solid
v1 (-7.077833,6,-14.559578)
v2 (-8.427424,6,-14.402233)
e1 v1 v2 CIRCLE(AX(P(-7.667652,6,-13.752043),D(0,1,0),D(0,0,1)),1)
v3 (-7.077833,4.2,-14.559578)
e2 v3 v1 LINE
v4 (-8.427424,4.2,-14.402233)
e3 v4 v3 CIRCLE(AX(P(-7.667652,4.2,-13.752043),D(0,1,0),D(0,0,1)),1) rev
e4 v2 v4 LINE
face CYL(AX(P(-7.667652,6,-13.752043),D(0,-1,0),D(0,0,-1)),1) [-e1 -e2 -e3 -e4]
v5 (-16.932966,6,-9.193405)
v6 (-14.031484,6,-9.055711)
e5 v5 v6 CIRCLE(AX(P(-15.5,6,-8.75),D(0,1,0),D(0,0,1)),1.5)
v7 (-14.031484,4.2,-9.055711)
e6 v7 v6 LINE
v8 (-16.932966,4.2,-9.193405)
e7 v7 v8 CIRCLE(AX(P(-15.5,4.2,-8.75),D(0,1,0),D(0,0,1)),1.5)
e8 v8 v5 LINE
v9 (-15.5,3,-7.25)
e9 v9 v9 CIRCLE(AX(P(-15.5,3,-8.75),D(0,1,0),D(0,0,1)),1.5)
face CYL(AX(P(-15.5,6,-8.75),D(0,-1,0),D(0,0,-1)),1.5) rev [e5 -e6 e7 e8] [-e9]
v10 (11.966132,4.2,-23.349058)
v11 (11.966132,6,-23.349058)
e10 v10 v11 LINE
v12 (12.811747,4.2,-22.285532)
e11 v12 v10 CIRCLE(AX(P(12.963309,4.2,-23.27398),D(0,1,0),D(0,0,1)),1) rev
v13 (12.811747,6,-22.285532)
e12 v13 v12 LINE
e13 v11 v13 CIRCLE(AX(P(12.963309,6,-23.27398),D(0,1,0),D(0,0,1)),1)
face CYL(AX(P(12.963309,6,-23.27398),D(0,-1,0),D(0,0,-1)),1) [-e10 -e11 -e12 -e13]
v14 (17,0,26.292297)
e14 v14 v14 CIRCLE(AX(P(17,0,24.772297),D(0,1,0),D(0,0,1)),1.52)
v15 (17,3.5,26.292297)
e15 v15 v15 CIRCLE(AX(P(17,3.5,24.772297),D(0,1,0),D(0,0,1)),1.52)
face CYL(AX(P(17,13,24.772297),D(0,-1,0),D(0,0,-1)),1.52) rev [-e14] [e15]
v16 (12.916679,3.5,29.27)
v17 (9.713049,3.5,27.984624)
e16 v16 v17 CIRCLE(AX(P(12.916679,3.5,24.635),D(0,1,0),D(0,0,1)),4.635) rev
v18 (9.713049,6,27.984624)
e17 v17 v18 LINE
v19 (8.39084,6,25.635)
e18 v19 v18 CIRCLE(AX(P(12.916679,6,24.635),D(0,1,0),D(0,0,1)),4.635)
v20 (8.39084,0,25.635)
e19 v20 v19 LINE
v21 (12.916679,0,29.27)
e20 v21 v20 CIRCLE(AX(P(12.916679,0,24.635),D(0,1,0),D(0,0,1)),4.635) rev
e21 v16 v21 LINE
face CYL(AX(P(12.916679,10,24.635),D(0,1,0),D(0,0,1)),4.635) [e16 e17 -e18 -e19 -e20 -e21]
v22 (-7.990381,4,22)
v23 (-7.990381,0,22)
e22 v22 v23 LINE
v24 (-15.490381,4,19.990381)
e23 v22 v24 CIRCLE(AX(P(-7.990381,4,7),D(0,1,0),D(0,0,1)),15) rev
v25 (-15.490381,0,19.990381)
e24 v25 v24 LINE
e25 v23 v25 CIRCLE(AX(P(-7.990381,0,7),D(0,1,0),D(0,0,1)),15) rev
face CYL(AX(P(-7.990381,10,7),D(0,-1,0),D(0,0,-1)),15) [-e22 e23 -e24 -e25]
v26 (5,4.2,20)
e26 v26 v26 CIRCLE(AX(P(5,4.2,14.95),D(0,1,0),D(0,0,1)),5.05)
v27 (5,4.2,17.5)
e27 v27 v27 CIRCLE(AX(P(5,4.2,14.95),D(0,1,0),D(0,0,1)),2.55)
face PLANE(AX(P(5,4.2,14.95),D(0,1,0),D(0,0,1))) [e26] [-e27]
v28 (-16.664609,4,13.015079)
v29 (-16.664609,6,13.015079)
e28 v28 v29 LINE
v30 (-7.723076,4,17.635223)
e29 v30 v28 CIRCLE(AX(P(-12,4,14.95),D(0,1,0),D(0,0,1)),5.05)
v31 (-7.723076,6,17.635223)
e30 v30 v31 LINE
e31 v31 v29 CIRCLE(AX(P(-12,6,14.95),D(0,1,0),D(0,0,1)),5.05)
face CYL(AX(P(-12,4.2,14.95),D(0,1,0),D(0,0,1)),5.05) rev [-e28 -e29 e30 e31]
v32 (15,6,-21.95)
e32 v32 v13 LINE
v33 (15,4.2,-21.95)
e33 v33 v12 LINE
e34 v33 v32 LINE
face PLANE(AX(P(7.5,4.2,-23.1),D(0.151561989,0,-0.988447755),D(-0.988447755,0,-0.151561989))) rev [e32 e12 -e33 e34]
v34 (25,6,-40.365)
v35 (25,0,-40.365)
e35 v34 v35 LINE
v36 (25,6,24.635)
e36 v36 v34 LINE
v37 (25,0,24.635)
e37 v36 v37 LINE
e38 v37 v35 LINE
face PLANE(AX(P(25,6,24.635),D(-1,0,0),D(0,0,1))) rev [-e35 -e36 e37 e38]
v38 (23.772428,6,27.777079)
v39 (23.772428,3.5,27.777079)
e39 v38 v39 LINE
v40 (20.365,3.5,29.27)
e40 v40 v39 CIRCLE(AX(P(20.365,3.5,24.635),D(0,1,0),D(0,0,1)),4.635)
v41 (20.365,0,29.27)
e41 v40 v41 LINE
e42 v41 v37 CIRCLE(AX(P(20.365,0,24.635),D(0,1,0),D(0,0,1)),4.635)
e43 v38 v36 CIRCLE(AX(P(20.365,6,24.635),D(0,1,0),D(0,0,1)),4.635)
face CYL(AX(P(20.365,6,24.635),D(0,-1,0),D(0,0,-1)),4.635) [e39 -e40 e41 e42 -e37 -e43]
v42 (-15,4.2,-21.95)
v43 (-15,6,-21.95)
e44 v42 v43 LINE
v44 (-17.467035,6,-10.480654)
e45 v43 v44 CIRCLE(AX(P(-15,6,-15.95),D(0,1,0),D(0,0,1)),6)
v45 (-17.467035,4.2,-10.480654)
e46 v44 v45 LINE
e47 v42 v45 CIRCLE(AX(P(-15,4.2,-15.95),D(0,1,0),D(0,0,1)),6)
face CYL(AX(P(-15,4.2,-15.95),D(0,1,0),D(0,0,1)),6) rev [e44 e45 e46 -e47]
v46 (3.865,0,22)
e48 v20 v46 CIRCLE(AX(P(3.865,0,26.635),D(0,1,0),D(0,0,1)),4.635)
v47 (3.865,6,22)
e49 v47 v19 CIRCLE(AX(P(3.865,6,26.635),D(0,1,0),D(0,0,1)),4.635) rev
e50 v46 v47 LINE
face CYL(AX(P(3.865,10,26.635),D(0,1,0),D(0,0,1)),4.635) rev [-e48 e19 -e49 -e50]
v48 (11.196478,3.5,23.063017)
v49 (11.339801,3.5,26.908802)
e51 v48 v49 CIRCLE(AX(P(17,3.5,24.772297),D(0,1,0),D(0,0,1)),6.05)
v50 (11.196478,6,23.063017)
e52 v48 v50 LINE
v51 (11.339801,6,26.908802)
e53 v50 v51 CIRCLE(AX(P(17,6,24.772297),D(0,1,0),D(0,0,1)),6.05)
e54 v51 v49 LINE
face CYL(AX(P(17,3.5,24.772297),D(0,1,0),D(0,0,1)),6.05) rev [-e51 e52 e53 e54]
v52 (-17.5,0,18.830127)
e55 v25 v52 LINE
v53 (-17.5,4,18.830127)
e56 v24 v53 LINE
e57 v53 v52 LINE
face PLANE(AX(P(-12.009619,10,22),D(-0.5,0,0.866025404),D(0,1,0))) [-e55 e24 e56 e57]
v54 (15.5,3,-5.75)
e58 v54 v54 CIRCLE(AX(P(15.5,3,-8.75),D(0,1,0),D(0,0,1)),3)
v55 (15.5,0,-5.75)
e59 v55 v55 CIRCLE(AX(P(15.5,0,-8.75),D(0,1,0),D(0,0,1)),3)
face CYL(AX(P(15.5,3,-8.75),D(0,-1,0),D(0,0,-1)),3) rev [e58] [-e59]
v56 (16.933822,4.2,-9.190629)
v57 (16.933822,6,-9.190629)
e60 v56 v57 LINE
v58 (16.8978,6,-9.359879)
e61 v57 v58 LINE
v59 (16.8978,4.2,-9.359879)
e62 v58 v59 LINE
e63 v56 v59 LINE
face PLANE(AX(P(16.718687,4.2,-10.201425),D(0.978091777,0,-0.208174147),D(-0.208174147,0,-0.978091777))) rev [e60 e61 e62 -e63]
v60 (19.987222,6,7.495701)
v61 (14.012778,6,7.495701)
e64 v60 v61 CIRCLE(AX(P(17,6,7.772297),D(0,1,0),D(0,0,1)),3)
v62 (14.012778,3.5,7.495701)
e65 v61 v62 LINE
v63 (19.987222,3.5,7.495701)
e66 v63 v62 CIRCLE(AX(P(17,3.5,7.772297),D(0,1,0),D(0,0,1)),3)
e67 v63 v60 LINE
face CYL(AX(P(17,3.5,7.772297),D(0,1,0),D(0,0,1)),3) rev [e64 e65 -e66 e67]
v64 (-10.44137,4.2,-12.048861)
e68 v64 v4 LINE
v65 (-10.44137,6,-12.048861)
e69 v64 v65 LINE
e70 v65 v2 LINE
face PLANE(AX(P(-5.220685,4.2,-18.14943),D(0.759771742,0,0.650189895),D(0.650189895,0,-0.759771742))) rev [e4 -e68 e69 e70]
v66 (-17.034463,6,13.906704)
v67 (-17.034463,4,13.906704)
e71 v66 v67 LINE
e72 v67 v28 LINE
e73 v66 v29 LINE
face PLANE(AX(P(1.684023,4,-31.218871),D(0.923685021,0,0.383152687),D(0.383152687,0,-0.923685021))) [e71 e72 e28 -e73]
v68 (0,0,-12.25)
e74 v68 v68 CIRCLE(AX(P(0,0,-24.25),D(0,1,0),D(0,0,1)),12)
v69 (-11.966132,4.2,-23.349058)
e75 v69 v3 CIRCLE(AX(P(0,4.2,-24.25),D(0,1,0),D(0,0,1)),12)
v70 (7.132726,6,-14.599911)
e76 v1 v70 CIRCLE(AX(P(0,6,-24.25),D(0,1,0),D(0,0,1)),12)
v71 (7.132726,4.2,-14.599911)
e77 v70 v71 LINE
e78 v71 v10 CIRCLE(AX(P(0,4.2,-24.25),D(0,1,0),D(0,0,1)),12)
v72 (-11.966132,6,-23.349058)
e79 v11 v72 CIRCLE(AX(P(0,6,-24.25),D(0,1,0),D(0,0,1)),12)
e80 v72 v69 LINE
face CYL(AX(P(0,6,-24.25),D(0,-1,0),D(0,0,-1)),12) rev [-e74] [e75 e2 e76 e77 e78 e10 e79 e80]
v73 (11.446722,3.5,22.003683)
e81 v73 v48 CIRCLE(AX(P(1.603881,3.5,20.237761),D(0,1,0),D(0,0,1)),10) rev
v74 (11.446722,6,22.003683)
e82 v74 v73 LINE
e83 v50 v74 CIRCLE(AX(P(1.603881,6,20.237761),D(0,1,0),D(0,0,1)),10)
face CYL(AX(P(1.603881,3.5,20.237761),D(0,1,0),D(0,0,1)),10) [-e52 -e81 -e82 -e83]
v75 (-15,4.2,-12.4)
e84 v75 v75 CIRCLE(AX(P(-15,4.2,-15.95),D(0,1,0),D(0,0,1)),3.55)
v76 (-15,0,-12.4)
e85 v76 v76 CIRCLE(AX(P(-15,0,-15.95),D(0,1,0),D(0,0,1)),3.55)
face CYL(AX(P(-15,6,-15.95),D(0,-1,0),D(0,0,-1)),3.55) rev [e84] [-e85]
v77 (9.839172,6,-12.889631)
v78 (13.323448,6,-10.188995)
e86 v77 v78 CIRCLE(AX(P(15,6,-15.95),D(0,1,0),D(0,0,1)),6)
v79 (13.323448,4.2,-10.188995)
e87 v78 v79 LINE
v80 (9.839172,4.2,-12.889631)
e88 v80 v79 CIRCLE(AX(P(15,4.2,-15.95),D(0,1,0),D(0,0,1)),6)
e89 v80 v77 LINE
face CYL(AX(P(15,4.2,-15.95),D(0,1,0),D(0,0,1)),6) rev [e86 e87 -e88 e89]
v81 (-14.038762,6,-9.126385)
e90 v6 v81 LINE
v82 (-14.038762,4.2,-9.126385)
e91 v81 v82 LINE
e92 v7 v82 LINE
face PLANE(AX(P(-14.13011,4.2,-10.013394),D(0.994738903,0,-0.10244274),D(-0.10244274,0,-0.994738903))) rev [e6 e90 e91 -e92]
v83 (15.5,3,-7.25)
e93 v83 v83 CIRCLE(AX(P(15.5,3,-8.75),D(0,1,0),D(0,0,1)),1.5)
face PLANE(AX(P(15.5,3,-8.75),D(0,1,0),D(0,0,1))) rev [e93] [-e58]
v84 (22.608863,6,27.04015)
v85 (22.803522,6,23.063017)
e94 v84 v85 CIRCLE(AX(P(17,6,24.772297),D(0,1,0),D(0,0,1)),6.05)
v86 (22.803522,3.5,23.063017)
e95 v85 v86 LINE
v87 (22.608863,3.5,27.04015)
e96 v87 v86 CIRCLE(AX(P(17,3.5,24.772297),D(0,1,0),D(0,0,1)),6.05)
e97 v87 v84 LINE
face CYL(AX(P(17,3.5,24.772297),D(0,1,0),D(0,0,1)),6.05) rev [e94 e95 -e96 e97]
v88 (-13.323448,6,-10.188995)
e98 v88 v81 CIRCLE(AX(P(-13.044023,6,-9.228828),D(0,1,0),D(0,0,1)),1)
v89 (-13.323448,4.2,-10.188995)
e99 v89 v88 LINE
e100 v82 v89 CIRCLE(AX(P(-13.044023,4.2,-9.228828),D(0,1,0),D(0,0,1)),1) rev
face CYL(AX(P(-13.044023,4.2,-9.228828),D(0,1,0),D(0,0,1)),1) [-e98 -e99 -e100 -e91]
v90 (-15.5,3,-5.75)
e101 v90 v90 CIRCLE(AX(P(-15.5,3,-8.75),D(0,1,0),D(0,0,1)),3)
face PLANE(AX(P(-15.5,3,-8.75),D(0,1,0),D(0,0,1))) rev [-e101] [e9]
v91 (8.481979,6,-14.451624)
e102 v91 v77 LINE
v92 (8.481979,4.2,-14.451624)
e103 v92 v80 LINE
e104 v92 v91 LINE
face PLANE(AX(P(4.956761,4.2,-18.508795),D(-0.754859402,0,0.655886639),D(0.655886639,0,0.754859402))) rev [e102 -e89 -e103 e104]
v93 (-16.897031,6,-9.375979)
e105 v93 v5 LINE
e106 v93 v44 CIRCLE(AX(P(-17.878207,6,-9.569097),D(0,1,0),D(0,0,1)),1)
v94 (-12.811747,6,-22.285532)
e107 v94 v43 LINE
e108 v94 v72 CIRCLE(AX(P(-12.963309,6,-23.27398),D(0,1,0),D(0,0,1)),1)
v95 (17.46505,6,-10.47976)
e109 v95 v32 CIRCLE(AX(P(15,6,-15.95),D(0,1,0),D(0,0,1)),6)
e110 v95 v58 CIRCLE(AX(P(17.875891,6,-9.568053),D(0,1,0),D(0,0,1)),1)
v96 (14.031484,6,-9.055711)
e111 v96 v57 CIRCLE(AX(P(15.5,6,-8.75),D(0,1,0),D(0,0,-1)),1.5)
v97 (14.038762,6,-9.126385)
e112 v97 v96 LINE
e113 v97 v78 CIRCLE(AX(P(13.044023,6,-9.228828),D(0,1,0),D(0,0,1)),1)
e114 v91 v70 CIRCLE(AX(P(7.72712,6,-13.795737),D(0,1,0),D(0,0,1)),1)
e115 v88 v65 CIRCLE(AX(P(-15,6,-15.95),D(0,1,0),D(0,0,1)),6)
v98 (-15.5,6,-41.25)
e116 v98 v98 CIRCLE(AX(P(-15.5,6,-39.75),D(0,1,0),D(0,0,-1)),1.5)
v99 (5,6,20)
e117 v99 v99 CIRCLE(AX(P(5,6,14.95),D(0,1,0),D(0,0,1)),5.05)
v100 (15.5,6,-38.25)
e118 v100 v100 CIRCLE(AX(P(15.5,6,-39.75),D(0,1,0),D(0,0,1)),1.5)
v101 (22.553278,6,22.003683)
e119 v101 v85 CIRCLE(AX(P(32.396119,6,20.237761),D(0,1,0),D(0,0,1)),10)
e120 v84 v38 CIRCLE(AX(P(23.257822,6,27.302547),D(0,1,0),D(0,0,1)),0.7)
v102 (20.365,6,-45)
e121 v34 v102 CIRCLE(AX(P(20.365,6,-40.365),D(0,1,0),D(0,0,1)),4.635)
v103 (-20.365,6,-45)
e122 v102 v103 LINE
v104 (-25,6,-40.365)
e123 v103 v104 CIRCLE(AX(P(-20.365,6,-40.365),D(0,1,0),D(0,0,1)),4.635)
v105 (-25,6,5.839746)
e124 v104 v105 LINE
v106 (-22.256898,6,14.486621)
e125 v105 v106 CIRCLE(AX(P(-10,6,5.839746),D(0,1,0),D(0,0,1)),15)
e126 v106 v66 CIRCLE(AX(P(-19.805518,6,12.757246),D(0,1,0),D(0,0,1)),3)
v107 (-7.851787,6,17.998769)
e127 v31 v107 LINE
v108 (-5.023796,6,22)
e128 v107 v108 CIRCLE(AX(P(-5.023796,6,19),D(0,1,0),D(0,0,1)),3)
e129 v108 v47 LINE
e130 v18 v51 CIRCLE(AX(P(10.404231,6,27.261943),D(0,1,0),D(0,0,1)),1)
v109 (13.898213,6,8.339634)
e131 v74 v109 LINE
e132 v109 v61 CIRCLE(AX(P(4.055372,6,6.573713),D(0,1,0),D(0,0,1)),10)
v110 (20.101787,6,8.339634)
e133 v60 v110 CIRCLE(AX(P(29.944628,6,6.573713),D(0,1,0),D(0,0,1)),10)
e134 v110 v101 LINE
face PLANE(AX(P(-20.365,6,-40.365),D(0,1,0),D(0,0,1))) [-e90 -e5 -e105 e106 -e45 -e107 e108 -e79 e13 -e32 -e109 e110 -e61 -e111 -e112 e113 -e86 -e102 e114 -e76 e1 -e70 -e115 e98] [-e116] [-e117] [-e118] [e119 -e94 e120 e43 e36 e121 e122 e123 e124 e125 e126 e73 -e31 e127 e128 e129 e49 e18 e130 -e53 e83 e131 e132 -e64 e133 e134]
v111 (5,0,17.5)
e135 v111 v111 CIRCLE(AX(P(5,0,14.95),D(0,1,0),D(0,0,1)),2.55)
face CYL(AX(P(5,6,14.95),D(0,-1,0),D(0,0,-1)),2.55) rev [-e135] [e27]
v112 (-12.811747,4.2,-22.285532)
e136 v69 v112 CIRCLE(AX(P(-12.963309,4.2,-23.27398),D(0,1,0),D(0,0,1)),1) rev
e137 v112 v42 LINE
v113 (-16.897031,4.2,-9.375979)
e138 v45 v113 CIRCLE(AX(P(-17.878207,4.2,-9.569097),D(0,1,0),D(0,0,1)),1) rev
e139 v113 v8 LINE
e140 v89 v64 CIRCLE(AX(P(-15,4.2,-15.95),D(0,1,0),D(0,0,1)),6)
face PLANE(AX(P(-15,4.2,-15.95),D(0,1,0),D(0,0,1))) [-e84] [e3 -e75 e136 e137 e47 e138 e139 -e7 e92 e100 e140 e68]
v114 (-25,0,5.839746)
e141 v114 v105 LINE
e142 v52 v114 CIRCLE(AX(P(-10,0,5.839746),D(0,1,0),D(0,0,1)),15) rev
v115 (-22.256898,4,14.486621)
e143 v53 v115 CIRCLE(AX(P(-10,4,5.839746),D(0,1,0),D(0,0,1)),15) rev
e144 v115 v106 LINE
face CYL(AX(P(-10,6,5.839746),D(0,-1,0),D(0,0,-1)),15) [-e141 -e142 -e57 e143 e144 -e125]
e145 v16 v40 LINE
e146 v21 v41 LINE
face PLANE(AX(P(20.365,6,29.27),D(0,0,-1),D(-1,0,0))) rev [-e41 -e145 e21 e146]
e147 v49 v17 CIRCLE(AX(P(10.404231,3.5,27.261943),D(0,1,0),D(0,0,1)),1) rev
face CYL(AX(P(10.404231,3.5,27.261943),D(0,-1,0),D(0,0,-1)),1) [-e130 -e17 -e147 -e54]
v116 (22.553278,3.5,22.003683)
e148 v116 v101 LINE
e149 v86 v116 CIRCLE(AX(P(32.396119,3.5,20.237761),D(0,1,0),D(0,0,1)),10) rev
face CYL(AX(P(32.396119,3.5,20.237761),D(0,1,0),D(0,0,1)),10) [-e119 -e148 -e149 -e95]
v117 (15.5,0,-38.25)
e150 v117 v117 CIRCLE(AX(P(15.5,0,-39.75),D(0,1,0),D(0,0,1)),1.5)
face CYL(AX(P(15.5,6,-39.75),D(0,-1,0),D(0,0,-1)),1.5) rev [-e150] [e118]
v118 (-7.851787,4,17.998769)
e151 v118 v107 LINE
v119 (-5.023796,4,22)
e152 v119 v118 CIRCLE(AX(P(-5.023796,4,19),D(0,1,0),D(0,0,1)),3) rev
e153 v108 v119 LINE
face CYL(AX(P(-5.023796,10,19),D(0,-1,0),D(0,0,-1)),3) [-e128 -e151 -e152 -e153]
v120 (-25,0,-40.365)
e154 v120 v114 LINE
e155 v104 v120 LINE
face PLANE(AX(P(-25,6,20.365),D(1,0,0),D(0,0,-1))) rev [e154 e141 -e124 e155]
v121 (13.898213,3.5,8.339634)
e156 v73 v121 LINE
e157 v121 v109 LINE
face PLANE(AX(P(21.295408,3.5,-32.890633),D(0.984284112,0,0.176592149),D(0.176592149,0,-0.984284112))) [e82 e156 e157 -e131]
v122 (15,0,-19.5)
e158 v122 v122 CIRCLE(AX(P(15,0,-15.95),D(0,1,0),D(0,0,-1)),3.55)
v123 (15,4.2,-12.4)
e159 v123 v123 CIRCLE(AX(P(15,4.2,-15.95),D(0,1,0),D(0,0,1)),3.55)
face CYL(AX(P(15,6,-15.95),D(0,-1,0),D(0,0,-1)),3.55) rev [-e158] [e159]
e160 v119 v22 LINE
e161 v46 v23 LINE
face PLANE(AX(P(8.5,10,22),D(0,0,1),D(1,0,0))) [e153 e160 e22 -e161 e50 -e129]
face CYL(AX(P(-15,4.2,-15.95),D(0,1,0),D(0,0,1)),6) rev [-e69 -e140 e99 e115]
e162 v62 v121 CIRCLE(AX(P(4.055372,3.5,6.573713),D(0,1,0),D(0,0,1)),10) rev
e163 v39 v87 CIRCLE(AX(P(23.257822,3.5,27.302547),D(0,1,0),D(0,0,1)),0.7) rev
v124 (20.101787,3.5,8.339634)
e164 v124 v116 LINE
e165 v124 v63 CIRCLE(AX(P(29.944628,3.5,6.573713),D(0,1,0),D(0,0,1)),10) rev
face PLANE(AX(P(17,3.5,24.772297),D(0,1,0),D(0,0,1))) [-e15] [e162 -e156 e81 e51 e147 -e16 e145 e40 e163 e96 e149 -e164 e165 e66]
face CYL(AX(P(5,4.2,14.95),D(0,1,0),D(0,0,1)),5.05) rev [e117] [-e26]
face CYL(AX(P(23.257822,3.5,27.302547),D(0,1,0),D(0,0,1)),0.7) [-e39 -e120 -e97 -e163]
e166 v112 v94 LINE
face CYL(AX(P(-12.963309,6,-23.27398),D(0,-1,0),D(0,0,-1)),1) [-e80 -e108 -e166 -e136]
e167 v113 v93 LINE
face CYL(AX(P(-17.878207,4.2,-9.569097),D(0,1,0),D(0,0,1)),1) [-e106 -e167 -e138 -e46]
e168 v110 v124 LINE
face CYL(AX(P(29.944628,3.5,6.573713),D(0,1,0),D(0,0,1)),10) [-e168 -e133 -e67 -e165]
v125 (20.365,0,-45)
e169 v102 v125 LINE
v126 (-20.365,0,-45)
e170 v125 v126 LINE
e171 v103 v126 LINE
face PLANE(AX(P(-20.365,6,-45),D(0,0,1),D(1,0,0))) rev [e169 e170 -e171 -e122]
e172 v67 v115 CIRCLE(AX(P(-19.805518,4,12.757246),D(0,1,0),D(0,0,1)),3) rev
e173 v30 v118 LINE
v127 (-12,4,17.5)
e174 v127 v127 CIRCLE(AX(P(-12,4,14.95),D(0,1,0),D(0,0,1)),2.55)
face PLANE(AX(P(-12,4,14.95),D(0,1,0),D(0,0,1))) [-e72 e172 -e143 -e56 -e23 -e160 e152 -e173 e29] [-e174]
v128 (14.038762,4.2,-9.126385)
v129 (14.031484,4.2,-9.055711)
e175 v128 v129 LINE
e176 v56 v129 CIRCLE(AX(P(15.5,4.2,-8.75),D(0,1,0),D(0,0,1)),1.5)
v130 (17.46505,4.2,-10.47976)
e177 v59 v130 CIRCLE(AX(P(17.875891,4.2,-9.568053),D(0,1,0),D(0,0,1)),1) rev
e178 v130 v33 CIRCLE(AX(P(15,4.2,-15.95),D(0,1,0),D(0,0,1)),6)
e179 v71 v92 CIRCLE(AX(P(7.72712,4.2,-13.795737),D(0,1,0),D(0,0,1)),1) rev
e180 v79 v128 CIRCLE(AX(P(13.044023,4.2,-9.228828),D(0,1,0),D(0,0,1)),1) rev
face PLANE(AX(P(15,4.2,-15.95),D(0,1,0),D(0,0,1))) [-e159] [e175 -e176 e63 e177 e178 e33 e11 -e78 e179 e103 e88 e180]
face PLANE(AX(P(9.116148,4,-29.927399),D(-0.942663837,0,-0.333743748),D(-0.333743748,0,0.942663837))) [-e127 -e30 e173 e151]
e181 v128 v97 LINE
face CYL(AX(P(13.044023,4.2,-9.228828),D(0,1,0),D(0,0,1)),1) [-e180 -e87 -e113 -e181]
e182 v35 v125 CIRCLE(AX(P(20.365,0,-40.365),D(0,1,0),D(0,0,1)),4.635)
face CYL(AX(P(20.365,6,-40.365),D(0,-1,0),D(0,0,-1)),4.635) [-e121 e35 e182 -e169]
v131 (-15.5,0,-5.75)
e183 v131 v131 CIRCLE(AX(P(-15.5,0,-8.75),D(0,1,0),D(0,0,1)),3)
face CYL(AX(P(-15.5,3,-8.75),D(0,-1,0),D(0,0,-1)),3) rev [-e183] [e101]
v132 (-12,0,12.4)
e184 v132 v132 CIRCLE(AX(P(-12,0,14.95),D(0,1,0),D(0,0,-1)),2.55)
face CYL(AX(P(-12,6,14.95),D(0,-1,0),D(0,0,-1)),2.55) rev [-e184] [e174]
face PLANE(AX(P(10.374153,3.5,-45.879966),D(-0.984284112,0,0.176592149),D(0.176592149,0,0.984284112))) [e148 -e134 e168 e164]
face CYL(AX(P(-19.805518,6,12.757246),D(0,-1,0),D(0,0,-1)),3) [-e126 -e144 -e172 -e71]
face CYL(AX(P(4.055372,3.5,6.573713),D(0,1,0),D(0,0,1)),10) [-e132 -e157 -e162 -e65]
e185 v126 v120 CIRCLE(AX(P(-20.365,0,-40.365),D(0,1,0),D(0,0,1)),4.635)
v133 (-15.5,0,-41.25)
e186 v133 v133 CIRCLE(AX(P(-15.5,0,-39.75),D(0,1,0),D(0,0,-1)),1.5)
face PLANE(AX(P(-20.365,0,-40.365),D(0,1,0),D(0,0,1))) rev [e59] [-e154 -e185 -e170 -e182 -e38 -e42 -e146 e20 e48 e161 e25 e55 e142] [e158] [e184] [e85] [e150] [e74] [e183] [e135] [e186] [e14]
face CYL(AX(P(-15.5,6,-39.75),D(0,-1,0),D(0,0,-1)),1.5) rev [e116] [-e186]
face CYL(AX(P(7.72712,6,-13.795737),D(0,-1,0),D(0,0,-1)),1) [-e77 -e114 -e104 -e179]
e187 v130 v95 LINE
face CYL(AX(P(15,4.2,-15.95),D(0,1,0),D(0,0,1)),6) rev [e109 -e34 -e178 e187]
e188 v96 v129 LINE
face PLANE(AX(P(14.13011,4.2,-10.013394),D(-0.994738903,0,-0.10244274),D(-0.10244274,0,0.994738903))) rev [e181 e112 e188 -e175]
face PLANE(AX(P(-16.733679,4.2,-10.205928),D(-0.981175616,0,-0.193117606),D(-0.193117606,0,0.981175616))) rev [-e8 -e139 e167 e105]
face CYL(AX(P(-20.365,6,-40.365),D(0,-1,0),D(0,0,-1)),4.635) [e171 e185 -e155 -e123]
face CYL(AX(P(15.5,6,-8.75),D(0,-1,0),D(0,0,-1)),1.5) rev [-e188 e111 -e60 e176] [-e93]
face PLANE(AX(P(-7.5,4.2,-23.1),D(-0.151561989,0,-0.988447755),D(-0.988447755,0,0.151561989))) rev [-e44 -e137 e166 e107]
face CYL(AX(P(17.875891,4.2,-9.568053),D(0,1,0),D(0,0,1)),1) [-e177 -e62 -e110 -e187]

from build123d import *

# Parameters (mm, degrees)
SKETCH1_R           = 3.55
SKETCH1_R_2         = 12
SKETCH1_R_3         = 1.5
SKETCH1_R_4         = 2.55
BOSS_EXTRUDE1_DEPTH = 6
SKETCH2_R           = 5.05
CUT_EXTRUDE1_DEPTH  = 1.8
SKETCH11_R          = 1.52
CUT_EXTRUDE9_DEPTH  = 13
SKETCH14_W          = 37.681595327
SKETCH14_H          = 11.476856365
CUT_EXTRUDE13_DEPTH = 10
FILLET1_R           = 4.635
FILLET2_R           = 4.635
SKETCH15_R          = 3
CUT_EXTRUDE14_DEPTH = 3
CHAMFER1_SIZE       = 7.5
CHAMFER1_SIZE2      = 12.990381057
FILLET4_R           = 15
CUT_EXTRUDE15_START = 6
CUT_EXTRUDE15_DEPTH = 2
FILLET5_R           = 3
FILLET6_R           = 1
CUT_EXTRUDE16_START = 6
CUT_EXTRUDE16_DEPTH = 2.5
FILLET7_R           = 1
FILLET8_R           = 0.7
FILLET9_R           = 10


with BuildPart() as part:
    # Sketch1 → Boss-Extrude1 (new body)
    with BuildSketch(Plane(origin=(0, 0, 0), x_dir=(1, 0, 0), z_dir=(0, 1, 0))):
        with BuildLine():
            Line((-20.365, 45), (20.365, 45))
            ThreePointArc((20.365, 45), (23.642439931, 43.642439931), (25, 40.365))
            Line((25, 40.365), (25, -24.635))
            ThreePointArc((25, -24.635), (23.642439931, -27.912439931), (20.365, -29.27))
            Line((20.365, -29.27), (-20.365, -29.27))
            Line((-20.365, -29.27), (-25, -29.27))
            Line((-25, -29.27), (-25, -20.365))
            Line((-25, -20.365), (-25, 40.365))
            ThreePointArc((-25, 40.365), (-23.642439931, 43.642439931), (-20.365, 45))
        make_face()
        with Locations(Location((-15, 15.95, 0), (0, 0, 270))):
            Circle(SKETCH1_R, mode=Mode.SUBTRACT)
        with Locations(Location((0, 24.25, 0), (0, 0, 270))):
            Circle(SKETCH1_R_2, mode=Mode.SUBTRACT)
        with Locations(Location((15.5, 39.75, 0), (0, 0, 270))):
            Circle(SKETCH1_R_3, mode=Mode.SUBTRACT)
        with Locations(Location((-15.5, 39.75, 0), (0, 0, 90))):
            Circle(SKETCH1_R_3, mode=Mode.SUBTRACT)
        with Locations(Location((15.5, 8.75, 0), (0, 0, 90))):
            Circle(SKETCH1_R_3, mode=Mode.SUBTRACT)
        with Locations(Location((-15.5, 8.75, 0), (0, 0, 270))):
            Circle(SKETCH1_R_3, mode=Mode.SUBTRACT)
        with Locations(Location((5, -14.95, 0), (0, 0, 270))):
            Circle(SKETCH1_R_4, mode=Mode.SUBTRACT)
        with Locations(Location((15, 15.95, 0), (0, 0, 90))):
            Circle(SKETCH1_R, mode=Mode.SUBTRACT)
        with Locations(Location((-12, -14.95, 0), (0, 0, 90))):
            Circle(SKETCH1_R_4, mode=Mode.SUBTRACT)
    extrude(amount=BOSS_EXTRUDE1_DEPTH)

    # Sketch2 → Cut-Extrude1 (cut)
    with BuildSketch(Plane(origin=(0, 6, 0), x_dir=(1, 0, 0), z_dir=(0, 1, 0))):
        with Locations(Location((5, -14.95, 0), (0, 0, 270))):
            Circle(SKETCH2_R)
        with Locations(Location((-12, -14.95, 0), (0, 0, 270))):
            Circle(SKETCH2_R)
        with BuildLine():
            Line((-7.5, 23.1), (-15, 21.95))
            ThreePointArc((-15, 21.95), (-20.935673069, 16.826233541), (-16.733678611, 10.205928406))
            Line((-16.733678611, 10.205928406), (-16.932966202, 9.193404855))
            Line((-16.932966202, 9.193404855), (-14, 8.75))
            Line((-14, 8.75), (-14.130110059, 10.013393942))
            ThreePointArc((-14.130110059, 10.013393942), (-12.101208946, 10.696714321), (-10.441369548, 12.048860628))
            Line((-10.441369548, 12.048860628), (-5.220684774, 18.149430314))
            Line((-5.220684774, 18.149430314), (-7.5, 23.1))
        make_face()
        with BuildLine():
            Line((4.956760879, 18.508794553), (9.839172222, 12.889631289))
            ThreePointArc((9.839172222, 12.889631289), (11.659255417, 10.966083304), (14.130110059, 10.013393942))
            Line((14.130110059, 10.013393942), (14, 8.75))
            Line((14, 8.75), (16.988984535, 8.931452623))
            Line((16.988984535, 8.931452623), (16.718687374, 10.201425071))
            ThreePointArc((16.718687374, 10.201425071), (20.936810995, 16.818490192), (15, 21.95))
            Line((15, 21.95), (7.5, 23.1))
            Line((7.5, 23.1), (4.956760879, 18.508794553))
        make_face()
    extrude(amount=-CUT_EXTRUDE1_DEPTH, mode=Mode.SUBTRACT)

    # Sketch11 → Cut-Extrude9 (cut)
    with BuildSketch(Plane(origin=(0, 0, 0), x_dir=(1, 0, 0), z_dir=(0, 1, 0))):
        with Locations(Location((17, -24.772297108, 0), (0, 0, 270))):
            Circle(SKETCH11_R)
    extrude(amount=CUT_EXTRUDE9_DEPTH, mode=Mode.SUBTRACT)

    # Sketch14 → Cut-Extrude13 (cut)
    with BuildSketch(Plane(origin=(0, 0, 0), x_dir=(1, 0, 0), z_dir=(0, 1, 0))):
        with Locations((-10.340797664, -27.738428183)):
            Rectangle(SKETCH14_W, SKETCH14_H)
    extrude(amount=CUT_EXTRUDE13_DEPTH, mode=Mode.SUBTRACT)

    # Fillet1
    fillet1_edges = [part.edges().sort_by_distance(p)[0] for p in [
        (8.5, 3, 22),
    ]]
    fillet(fillet1_edges, radius=FILLET1_R)

    # Fillet2
    fillet2_edges = [part.edges().sort_by_distance(p)[0] for p in [
        (8.5, 3, 29.27),
    ]]
    fillet(fillet2_edges, radius=FILLET2_R)

    # Sketch15 → Cut-Extrude14 (cut)
    with BuildSketch(Plane(origin=(0, 0, 0), x_dir=(1, 0, 0), z_dir=(0, 1, 0))):
        with Locations(Location((-15.5, 8.75, 0), (0, 0, 270))):
            Circle(SKETCH15_R)
        with Locations(Location((15.5, 8.75, 0), (0, 0, 270))):
            Circle(SKETCH15_R)
    extrude(amount=CUT_EXTRUDE14_DEPTH, mode=Mode.SUBTRACT)

    # Chamfer1
    chamfer1_edges = [part.edges().sort_by_distance(p)[0] for p in [
        (-25, 3, 22),
    ]]
    chamfer1_side = [part.faces().sort_by_distance(p)[0] for p in [
        (-25, 3, -9.1825),
    ]]
    chamfer(chamfer1_edges, length=CHAMFER1_SIZE, length2=CHAMFER1_SIZE2, reference=chamfer1_side[0])

    # Fillet4
    fillet4_edges = [part.edges().sort_by_distance(p)[0] for p in [
        (-12.009618943, 3, 22),
        (-25, 3, 14.5),
    ]]
    fillet(fillet4_edges, radius=FILLET4_R)

    # Sketch16 → Cut-Extrude15 (cut)
    with BuildSketch(Plane(origin=(0, 0, 0), x_dir=(1, 0, 0), z_dir=(0, 1, 0)).offset(CUT_EXTRUDE15_START)):
        with BuildLine():
            Line((-16.664609357, -13.015078929), (-20.669862741, -22.670740182))
            Line((-20.669862741, -22.670740182), (-11.293848706, -27.720919461))
            Line((-11.293848706, -27.720919461), (-7.723076168, -17.635222996))
            ThreePointArc((-7.723076168, -17.635222996), (-9.681809366, -10.463521182), (-16.664609357, -13.015078929))
        make_face()
    extrude(amount=-CUT_EXTRUDE15_DEPTH, mode=Mode.SUBTRACT)

    # Fillet5
    # the kernel refuses this fillet: 3 mm, written as the material it takes off along each edge
    with BuildSketch(Plane(origin=(-9.249648628, 16.565462004, 21.947048042), x_dir=(0.3337437483266481, 0, -0.9426638374589739), z_dir=(0, -1, 0))) as fillet5_piece_1:
        with BuildLine():
            CenterArc((4.188427656, 3), FILLET5_R, 160.503835971, 109.496164029)
            Line((1.360436144, 4.001231245), (1.077636993, 4.101354369))
            ThreePointArc((1.077636993, 4.101354369), (0.087557633, 1.30486151), (-0.290206287, 0.076028357))
            Line((-0.290206287, 0.076028357), (0, -0.3))
            Line((0, -0.3), (4.188427656, -0.3))
            Line((4.188427656, -0.3), (4.188427656, 0))
        make_face()
    extrude(amount=12.565462004, mode=Mode.SUBTRACT)
    with BuildSketch(Plane(origin=(-18.743864962, 18.470022706, 18.027642644), x_dir=(0.3831526873327851, 0, -0.9236850210919656), z_dir=(0, -1, 0))) as fillet5_piece_2:
        with BuildLine():
            CenterArc((4.461410952, -3), FILLET5_R, 90, 122.26907024)
            ThreePointArc((1.92476045, -4.601687931), (0.769762504, -2.381410701), (0, 0))
            Line((0, 0), (4.461410952, 0))
        make_face()
    extrude(amount=14.470022706, mode=Mode.SUBTRACT)

    # Fillet6
    fillet6_edges = [part.edges().sort_by_distance(p)[0] for p in [
        (-14.130110059, 5.1, -10.013393942),
        (-16.733678611, 5.1, -10.205928406),
        (14.130110059, 5.1, -10.013393942),
        (16.718687374, 5.1, -10.201425071),
        (11.861373055, 5.1, -22.431256132),
        (7.852565986, 5.1, -15.176014799),
        (-7.802278744, 5.1, -15.132739095),
        (-11.861373055, 5.1, -22.431256132),
    ]]
    fillet(fillet6_edges, radius=FILLET6_R)

    # Sketch17 → Cut-Extrude16 (cut)
    with BuildSketch(Plane(origin=(0, 0, 0), x_dir=(1, 0, 0), z_dir=(0, 1, 0)).offset(CUT_EXTRUDE16_START)):
        with BuildLine():
            Line((11.327335926, -22.66911326), (14, -7.772297108))
            ThreePointArc((14, -7.772297108), (17, -4.772297108), (20, -7.772297108))
            Line((20, -7.772297108), (22.672664074, -22.66911326))
            ThreePointArc((22.672664074, -22.66911326), (17, -30.822297108), (11.327335926, -22.66911326))
        make_face()
    extrude(amount=-CUT_EXTRUDE16_DEPTH, mode=Mode.SUBTRACT)

    # Fillet7
    # the kernel refuses this fillet: 1 mm, written as the material it takes off along each edge
    with BuildSketch(Plane(origin=(12.953622769, 3.5, 29.27), x_dir=(-0.9295463102395678, 0, -0.36870537983599505), z_dir=(0, 1, 0))) as fillet7_piece_1:
        with BuildLine():
            CenterArc((3.110158636, -0.926607536), FILLET7_R, 67.912019708, 154.403348054)
            Line((2.370708081, -1.599818408), (2.296763026, -1.667139495))
            ThreePointArc((2.296763026, -1.667139495), (1.225310358, -0.740699506), (-0.034759798, -0.093764367))
            Line((-0.034759798, -0.093764367), (-0.036870538, 0.092954631))
            ThreePointArc((-0.036870538, 0.092954631), (-0.002529968, 0.106575849), (3.523791509, 0.092660754))
            Line((3.523791509, 0.092660754), (3.48618852, 0))
        make_face()
    extrude(amount=11.215471301, mode=Mode.SUBTRACT)

    # Fillet8
    fillet8_edges = [part.edges().sort_by_distance(p)[0] for p in [
        (21.112884992, 4.75, 29.209264207),
    ]]
    fillet(fillet8_edges, radius=FILLET8_R)

    # Fillet9
    fillet9_edges = [part.edges().sort_by_distance(p)[0] for p in [
        (22.672664074, 4.75, 22.66911326),
        (20, 4.75, 7.772297108),
        (11.327335926, 4.75, 22.66911326),
        (14, 4.75, 7.772297108),
    ]]
    fillet(fillet9_edges, radius=FILLET9_R)


solid = part.part
